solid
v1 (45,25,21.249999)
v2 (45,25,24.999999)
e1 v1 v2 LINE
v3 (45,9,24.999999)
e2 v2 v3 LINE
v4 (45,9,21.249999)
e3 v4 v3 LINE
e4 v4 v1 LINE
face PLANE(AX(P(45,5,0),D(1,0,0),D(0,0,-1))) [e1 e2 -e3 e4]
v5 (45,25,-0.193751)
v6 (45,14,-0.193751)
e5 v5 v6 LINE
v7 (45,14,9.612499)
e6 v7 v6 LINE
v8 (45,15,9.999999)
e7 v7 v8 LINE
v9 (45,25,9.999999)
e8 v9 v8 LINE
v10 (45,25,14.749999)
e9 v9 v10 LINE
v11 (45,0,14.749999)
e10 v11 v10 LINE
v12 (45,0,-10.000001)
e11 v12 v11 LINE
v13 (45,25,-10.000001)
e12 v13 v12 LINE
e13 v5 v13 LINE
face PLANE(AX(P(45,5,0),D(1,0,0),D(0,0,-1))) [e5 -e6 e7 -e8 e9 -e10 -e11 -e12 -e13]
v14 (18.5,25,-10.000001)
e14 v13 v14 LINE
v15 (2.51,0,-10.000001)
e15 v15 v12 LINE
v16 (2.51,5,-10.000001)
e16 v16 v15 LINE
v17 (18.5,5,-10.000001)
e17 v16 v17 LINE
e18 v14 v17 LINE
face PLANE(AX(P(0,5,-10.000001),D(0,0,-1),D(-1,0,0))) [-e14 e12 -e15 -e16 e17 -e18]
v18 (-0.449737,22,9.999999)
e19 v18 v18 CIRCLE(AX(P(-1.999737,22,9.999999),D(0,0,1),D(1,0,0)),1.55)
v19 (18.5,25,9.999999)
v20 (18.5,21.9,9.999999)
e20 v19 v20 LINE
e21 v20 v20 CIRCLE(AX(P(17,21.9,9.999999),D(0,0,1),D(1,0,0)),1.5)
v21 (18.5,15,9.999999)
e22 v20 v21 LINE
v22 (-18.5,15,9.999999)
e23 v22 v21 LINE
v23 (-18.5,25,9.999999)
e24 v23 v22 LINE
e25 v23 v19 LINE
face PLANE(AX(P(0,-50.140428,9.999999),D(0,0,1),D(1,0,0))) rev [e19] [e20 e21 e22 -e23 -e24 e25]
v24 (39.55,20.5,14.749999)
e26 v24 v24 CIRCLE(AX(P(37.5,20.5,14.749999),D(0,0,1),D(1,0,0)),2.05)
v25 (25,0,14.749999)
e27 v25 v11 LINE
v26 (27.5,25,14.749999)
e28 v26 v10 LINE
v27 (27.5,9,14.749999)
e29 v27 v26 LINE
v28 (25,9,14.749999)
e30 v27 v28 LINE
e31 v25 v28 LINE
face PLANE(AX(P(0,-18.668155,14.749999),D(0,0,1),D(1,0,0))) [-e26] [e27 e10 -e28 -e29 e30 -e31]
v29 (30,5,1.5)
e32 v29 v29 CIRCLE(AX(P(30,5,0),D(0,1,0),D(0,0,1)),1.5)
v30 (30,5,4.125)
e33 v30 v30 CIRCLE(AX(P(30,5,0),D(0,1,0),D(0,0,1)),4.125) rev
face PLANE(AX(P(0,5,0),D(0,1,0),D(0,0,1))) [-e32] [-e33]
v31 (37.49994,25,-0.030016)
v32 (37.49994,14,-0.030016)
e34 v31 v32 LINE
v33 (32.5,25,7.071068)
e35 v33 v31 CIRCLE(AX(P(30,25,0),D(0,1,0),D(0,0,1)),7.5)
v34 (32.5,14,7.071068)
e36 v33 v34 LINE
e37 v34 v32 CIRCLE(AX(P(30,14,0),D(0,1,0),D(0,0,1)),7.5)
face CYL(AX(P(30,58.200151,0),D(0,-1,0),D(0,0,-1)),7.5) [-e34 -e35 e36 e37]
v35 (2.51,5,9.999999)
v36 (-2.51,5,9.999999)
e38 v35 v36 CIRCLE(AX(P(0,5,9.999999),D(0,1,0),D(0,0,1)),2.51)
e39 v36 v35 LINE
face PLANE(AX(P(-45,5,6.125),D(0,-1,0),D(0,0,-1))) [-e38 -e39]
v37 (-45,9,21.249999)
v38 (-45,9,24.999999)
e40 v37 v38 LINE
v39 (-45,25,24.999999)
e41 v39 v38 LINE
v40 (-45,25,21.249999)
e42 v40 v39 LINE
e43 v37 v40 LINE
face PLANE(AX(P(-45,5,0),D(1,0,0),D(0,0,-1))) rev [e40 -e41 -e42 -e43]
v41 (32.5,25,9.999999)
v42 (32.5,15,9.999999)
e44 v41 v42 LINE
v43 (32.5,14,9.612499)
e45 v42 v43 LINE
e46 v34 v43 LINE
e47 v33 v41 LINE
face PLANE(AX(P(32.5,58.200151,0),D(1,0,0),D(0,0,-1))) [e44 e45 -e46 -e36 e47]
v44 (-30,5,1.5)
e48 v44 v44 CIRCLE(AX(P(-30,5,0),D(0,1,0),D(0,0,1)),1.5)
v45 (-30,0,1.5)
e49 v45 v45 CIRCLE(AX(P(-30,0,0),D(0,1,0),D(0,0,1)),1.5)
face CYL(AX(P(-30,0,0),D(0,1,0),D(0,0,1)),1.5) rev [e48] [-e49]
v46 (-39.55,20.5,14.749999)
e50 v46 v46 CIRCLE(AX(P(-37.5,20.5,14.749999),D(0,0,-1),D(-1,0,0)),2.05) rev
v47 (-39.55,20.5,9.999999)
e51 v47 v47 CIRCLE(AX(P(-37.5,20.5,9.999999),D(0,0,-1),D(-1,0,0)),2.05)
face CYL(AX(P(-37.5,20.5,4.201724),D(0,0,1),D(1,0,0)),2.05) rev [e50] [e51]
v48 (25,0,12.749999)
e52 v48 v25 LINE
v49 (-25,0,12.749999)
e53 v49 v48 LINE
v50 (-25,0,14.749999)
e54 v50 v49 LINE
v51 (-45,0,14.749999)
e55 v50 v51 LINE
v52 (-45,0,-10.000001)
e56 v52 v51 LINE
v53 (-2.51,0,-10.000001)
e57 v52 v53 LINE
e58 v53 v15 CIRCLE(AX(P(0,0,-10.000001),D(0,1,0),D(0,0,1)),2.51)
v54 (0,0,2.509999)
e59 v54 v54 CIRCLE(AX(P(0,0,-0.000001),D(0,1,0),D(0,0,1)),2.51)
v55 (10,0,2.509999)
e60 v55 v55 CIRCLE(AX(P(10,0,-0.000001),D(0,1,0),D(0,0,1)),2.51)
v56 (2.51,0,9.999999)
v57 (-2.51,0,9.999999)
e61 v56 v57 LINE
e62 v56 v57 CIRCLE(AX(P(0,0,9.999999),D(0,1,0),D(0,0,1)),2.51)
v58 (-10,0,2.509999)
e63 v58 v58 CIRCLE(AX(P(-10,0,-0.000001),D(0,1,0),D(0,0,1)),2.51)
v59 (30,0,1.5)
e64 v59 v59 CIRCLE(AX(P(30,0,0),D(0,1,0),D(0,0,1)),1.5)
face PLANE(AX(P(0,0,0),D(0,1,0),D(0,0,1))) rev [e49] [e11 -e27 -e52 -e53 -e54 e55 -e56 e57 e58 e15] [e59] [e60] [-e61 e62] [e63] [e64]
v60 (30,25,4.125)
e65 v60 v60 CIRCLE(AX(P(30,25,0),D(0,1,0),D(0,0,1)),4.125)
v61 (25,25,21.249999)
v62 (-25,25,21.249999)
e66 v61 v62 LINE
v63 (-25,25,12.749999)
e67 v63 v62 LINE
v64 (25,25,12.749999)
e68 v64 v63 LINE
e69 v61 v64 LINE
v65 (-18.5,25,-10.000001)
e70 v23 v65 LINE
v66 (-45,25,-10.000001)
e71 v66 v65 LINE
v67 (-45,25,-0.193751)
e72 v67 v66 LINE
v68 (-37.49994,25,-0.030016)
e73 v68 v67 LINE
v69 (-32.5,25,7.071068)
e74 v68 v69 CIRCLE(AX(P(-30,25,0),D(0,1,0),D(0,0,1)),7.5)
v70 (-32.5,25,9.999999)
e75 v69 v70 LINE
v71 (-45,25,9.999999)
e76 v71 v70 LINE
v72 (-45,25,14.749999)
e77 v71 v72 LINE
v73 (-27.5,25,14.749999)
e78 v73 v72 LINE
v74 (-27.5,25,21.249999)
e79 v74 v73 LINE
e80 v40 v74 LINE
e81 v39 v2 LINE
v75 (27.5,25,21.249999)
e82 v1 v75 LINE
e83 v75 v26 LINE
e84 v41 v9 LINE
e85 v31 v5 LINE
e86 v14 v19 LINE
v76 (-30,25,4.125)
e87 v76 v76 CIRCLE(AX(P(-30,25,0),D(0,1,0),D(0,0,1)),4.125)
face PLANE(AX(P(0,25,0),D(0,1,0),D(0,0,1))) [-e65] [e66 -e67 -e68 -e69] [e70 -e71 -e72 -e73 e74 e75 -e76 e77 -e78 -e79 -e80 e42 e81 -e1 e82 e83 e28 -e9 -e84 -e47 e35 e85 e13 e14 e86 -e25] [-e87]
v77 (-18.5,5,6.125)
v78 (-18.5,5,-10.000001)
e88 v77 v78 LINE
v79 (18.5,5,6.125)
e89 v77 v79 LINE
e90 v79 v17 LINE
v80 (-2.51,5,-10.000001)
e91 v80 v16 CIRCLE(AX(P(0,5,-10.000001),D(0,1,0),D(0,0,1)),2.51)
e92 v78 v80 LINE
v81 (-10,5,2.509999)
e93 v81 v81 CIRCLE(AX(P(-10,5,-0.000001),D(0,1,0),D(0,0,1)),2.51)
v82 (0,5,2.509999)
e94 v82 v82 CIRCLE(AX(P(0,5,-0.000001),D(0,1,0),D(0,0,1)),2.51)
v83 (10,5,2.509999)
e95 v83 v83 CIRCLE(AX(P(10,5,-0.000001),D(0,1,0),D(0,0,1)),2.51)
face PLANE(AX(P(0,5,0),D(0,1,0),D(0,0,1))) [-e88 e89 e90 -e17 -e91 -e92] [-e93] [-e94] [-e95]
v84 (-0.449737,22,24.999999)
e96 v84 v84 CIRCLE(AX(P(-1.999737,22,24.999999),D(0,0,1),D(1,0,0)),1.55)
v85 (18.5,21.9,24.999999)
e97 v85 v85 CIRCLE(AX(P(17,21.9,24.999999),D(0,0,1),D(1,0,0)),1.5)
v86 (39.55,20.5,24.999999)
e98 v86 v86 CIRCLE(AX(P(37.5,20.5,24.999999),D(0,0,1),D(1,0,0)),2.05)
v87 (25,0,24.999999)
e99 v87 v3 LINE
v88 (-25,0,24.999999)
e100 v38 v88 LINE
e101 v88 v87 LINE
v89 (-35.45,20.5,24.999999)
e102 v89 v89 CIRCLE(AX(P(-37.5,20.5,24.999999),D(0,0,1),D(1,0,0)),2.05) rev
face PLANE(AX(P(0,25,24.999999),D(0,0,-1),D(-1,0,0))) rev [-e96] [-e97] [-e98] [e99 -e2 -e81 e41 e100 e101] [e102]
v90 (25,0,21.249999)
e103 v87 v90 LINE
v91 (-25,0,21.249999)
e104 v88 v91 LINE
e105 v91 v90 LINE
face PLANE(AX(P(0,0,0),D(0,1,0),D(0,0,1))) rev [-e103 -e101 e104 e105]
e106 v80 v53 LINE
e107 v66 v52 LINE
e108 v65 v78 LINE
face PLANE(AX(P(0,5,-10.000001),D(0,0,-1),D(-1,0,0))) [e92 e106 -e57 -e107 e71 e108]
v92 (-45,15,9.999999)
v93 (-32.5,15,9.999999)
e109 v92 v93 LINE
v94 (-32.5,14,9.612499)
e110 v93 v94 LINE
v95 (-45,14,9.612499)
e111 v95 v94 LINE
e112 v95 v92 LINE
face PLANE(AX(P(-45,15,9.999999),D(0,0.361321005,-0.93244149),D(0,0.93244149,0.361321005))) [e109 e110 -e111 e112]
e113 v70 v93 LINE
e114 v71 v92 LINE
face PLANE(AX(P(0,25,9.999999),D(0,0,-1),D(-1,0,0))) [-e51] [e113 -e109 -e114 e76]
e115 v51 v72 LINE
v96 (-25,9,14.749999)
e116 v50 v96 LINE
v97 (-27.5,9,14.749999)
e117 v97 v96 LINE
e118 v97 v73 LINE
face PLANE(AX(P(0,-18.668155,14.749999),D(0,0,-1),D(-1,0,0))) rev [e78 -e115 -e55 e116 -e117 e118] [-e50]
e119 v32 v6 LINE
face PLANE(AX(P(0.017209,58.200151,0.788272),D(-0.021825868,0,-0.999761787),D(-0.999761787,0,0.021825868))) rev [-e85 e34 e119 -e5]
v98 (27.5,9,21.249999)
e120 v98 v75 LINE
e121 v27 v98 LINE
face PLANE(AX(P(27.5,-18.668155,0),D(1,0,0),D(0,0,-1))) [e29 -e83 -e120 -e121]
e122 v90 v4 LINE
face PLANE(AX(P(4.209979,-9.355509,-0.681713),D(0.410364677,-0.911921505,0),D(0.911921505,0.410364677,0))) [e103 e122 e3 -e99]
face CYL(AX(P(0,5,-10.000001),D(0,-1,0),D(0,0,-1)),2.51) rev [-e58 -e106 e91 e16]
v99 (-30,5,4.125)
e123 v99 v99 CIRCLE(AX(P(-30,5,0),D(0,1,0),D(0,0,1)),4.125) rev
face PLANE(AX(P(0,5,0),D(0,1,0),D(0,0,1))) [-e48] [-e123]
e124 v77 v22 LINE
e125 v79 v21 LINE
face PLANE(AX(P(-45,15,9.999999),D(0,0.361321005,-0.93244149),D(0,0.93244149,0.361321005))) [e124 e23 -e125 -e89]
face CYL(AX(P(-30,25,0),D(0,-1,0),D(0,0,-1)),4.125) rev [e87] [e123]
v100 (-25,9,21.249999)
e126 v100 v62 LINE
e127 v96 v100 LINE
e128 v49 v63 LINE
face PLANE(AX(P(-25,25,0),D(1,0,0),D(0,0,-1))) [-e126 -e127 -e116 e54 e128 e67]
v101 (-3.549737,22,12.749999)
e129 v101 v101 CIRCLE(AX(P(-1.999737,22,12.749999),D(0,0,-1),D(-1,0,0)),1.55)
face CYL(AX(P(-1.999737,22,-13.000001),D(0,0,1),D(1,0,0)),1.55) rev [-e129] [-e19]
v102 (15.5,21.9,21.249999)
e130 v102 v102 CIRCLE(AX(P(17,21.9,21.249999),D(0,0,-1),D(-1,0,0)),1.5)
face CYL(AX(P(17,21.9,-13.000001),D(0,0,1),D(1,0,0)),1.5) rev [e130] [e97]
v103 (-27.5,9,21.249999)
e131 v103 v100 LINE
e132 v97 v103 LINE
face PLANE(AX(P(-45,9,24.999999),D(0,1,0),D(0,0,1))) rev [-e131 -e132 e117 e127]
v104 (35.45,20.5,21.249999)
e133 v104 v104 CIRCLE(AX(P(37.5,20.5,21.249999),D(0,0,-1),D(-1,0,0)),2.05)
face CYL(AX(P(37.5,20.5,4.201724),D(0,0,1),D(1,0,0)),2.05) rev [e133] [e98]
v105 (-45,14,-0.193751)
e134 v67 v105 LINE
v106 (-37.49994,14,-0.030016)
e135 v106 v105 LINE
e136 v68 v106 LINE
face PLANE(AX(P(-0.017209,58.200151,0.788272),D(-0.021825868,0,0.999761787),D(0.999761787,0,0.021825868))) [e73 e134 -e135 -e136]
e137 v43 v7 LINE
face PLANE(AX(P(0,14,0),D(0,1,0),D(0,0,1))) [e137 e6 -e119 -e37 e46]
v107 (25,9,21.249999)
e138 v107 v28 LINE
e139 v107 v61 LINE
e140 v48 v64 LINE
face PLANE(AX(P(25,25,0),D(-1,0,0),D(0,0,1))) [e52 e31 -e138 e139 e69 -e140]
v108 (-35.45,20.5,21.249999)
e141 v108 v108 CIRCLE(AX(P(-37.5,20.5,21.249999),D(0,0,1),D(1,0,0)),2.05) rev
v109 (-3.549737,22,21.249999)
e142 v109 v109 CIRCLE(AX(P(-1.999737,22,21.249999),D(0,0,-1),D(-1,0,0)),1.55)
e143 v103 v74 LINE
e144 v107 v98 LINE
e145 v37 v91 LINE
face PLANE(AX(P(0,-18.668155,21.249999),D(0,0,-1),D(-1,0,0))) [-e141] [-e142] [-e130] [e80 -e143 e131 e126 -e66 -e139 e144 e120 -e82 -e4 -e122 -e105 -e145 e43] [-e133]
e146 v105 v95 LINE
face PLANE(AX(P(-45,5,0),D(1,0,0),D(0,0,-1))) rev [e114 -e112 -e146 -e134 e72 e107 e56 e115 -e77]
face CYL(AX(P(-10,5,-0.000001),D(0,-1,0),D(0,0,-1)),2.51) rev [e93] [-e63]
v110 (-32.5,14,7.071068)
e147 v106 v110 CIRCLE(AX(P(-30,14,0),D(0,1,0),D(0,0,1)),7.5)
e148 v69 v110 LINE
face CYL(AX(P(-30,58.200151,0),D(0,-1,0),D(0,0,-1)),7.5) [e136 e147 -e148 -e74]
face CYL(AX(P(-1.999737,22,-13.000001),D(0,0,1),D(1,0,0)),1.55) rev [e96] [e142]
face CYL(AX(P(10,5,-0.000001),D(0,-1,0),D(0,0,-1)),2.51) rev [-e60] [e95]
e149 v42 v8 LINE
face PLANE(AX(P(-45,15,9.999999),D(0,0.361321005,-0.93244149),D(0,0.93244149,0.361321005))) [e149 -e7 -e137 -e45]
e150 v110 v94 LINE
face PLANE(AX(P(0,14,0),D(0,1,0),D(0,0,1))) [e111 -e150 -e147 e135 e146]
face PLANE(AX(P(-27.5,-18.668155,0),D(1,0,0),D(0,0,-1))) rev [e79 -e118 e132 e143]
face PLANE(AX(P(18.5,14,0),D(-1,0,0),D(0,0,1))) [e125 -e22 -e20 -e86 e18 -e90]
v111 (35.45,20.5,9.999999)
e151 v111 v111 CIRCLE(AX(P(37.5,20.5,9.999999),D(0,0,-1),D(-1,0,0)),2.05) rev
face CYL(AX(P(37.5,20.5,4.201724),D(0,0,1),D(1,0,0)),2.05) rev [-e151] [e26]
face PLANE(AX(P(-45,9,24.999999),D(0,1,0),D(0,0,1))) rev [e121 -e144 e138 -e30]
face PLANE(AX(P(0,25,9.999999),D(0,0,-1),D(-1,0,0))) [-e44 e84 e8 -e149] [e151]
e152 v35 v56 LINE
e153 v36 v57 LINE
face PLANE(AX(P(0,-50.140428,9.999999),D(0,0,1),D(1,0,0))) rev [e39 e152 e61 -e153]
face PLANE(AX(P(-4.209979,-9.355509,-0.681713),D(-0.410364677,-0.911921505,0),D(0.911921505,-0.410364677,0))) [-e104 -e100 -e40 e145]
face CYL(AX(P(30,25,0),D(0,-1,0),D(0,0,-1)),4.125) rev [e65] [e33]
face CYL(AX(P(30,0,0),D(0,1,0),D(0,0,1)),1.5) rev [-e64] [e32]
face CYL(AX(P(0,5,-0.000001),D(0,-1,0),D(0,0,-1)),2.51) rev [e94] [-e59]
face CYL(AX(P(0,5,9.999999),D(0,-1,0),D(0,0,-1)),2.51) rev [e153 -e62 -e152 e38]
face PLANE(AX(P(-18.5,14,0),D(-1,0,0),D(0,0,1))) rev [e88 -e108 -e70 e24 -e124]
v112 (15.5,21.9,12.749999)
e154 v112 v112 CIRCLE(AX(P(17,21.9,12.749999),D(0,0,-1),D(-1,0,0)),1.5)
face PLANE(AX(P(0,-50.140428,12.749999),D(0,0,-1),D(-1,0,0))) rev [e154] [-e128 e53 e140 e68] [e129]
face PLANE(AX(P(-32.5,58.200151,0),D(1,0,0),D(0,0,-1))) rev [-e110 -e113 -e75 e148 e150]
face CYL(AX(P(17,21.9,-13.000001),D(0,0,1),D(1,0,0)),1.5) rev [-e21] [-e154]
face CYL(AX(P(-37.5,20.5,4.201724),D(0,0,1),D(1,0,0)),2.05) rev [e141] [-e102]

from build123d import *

# Parameters (mm, degrees)
SKETCH1_R               = 2.51
BOSS_EXTRUDE1_DEPTH     = 5
SKETCH2_R               = 6.125
SKETCH2_R_2             = 4.125
BOSS_EXTRUDE2_DEPTH     = 20
SKETCH1_3_W             = 20
SKETCH1_3_H             = 15
BOSS_EXTRUDE3_DEPTH     = 25
SKETCH3_W               = 17.5
SKETCH3_H               = 6.5
CUT_EXTRUDE2_DEPTH      = 21.5
CUT_EXTRUDE3_REACH      = 64.249
SKETCH4_R               = 2.05
SKETCH5_W               = 13.25
SKETCH5_H               = 9
CUT_EXTRUDE4_DEPTH      = 97.695397829
BOSS_EXTRUDE4_DEPTH     = 90
SKETCH9_R               = 1.5
CUT_EXTRUDE6_DEPTH      = 56.226804735
BOSS_EXTRUDE9_OUTLINE_W = 26.5
BOSS_EXTRUDE9_OUTLINE_H = 20
BOSS_EXTRUDE9_OUTLINE_R = 6.125
BOSS_EXTRUDE9_DEPTH     = 9
SKETCH12_R              = 7.5
SKETCH12_R_2            = 6.125
SKETCH12_W              = 5
SKETCH12_H              = 0.387499923
BOSS_EXTRUDE10_DEPTH    = 11
BOSS_EXTRUDE11_START    = -25
SKETCH13_W              = 50
SKETCH13_H              = 3.75
BOSS_EXTRUDE11_DEPTH    = 25
BOSS_EXTRUDE12_DEPTH    = 9
BOSS_EXTRUDE13_DEPTH    = 3.75
SKETCH16_R              = 1.55
SKETCH16_R_2            = 1.5
CUT_EXTRUDE7_DEPTH      = 38


# Read off the part's stored shape, not the designer's step: Boss-Extrude9
with BuildPart() as part:
    # Sketch1 → Boss-Extrude1 (new body)
    with BuildSketch(Plane(origin=(0, 0, 0), x_dir=(1, 0, 0), z_dir=(0, 1, 0))):
        with BuildLine():
            ThreePointArc((-2.51, -9.999999226), (0, -7.489999226), (2.51, -9.999999226))
            Line((2.51, -9.999999226), (45, -9.999999226))
            Line((45, -9.999999226), (45, 10.000000774))
            Line((45, 10.000000774), (2.51, 10.000000774))
            ThreePointArc((2.51, 10.000000774), (0, 7.490000774), (-2.51, 10.000000774))
            Line((-2.51, 10.000000774), (-45, 10.000000774))
            Line((-45, 10.000000774), (-45, -9.999999226))
            Line((-45, -9.999999226), (-2.51, -9.999999226))
        make_face()
        with BuildLine():
            ThreePointArc((-7.500032569, 0.22419454), (-10, -2.509999226), (-12.499967431, 0.22419454))
            ThreePointArc((-12.499967431, 0.22419454), (-10, 2.510000774), (-7.500032569, 0.22419454))
        make_face(mode=Mode.SUBTRACT)
        with BuildLine():
            ThreePointArc((2.499967431, 0.22419454), (0, -2.509999226), (-2.499967431, 0.22419454))
            ThreePointArc((-2.499967431, 0.22419454), (0, 2.510000774), (2.499967431, 0.22419454))
        make_face(mode=Mode.SUBTRACT)
        with Locations(Location((10, 7.74e-07, 0), (0, 0, 270))):
            Circle(SKETCH1_R, mode=Mode.SUBTRACT)
    extrude(amount=BOSS_EXTRUDE1_DEPTH)

    # Sketch2 → Boss-Extrude2 (add)
    # profile 1 of 2: a face of its own
    with BuildSketch(Plane(origin=(0, 5, 0), x_dir=(1, 0, 0), z_dir=(0, 1, 0))):
        with Locations(Location((-30, 0, 0), (0, 0, 270))):
            Circle(SKETCH2_R)
        with Locations(Location((-30, 0, 0), (0, 0, 270))):
            Circle(SKETCH2_R_2, mode=Mode.SUBTRACT)
    # profile 2 of 2: a face of its own
    with BuildSketch(Plane(origin=(0, 5, 0), x_dir=(1, 0, 0), z_dir=(0, 1, 0))):
        with Locations(Location((30, 0, 0), (0, 0, 270))):
            Circle(SKETCH2_R)
        with Locations(Location((30, 0, 0), (0, 0, 270))):
            Circle(SKETCH2_R_2, mode=Mode.SUBTRACT)
    extrude(amount=BOSS_EXTRUDE2_DEPTH)

    # Sketch1<3> → Boss-Extrude3 (add)
    with BuildSketch(Plane(origin=(0, 0, 0), x_dir=(1, 0, 0), z_dir=(0, 1, 0))):
        with Locations((35, -17.499999226)):
            Rectangle(SKETCH1_3_W, SKETCH1_3_H)
        with Locations((-35, -17.499999226)):
            Rectangle(SKETCH1_3_W, SKETCH1_3_H)
    extrude(amount=BOSS_EXTRUDE3_DEPTH)

    # Sketch3 → Cut-Extrude2 (cut)
    with BuildSketch(Plane(origin=(0, 25, 0), x_dir=(1, 0, 0), z_dir=(0, 1, 0))):
        with Locations((36.25, -17.999999226)):
            Rectangle(SKETCH3_W, SKETCH3_H)
        with Locations((-36.25, -17.999999226)):
            Rectangle(SKETCH3_W, SKETCH3_H)
    extrude(amount=-CUT_EXTRUDE2_DEPTH, mode=Mode.SUBTRACT)

    # Cut-Extrude3: up to this face of the body (flat: up to its plane)
    cut_extrude3_end = Plane(part.part.faces().sort_by_distance((35, 15, 9.999999226))[0])
    # Sketch4 → Cut-Extrude3 (cut, up to the picked face)
    with BuildSketch(Plane.XY.offset(24.999999226), mode=Mode.PRIVATE) as cut_extrude3_sk1:
        with Locations((37.5, 20.5)):
            Circle(SKETCH4_R)
    cut_extrude3_tool1 = split(extrude(cut_extrude3_sk1.sketch, amount=-CUT_EXTRUDE3_REACH, mode=Mode.PRIVATE), bisect_by=cut_extrude3_end, keep=Keep.BOTH, mode=Mode.PRIVATE)
    # Sketch4 → Cut-Extrude3 (cut, up to the picked face)
    with BuildSketch(Plane.XY.offset(24.999999226), mode=Mode.PRIVATE) as cut_extrude3_sk2:
        with Locations((-37.5, 20.5)):
            Circle(SKETCH4_R)
    cut_extrude3_tool2 = split(extrude(cut_extrude3_sk2.sketch, amount=-CUT_EXTRUDE3_REACH, mode=Mode.PRIVATE), bisect_by=cut_extrude3_end, keep=Keep.BOTH, mode=Mode.PRIVATE)
    add(cut_extrude3_tool1.solids().sort_by(Axis((37.5, 20.5, 24.999999), (0, 0, -1)))[0], mode=Mode.SUBTRACT)
    add(cut_extrude3_tool2.solids().sort_by(Axis((-37.5, 20.5, 24.999999), (0, 0, -1)))[0], mode=Mode.SUBTRACT)

    # Sketch5 → Cut-Extrude4 (cut, through all)
    with BuildSketch(Plane(origin=(45, 0, 0), x_dir=(0, 0, -1), z_dir=(1, 0, 0))):
        with Locations((-18.374999226, 4.5)):
            Rectangle(SKETCH5_W, SKETCH5_H)
    extrude(amount=-CUT_EXTRUDE4_DEPTH, mode=Mode.SUBTRACT)

    # Sketch6 → Boss-Extrude4 (add, through all)
    with BuildSketch(Plane(origin=(45, 0, 0), x_dir=(0, 0, -1), z_dir=(1, 0, 0))):
        Polygon((-9.999999226, 15), (-6.125, 5), (-9.999999226, 5), align=None)
    extrude(amount=-BOSS_EXTRUDE4_DEPTH)

    # Sketch9 → Cut-Extrude6 (cut, through all)
    with BuildSketch(Plane(origin=(0, 5, 0), x_dir=(1, 0, 0), z_dir=(0, 1, 0))):
        with Locations(Location((30, 0, 0), (0, 0, 270))):
            Circle(SKETCH9_R)
        with Locations(Location((-30, 0, 0), (0, 0, 270))):
            Circle(SKETCH9_R)
    extrude(amount=-CUT_EXTRUDE6_DEPTH, mode=Mode.SUBTRACT)

    # Boss-Extrude9 outline → Boss-Extrude9 (add)
    # profile 1 of 2: a face of its own
    with BuildSketch(Plane(origin=(0, 5, 0), x_dir=(1, 0, 0), z_dir=(0, 1, 0))):
        with Locations((-31.75, 7.74e-07)):
            Rectangle(BOSS_EXTRUDE9_OUTLINE_W, BOSS_EXTRUDE9_OUTLINE_H)
        with Locations((-30, 0)):
            Circle(BOSS_EXTRUDE9_OUTLINE_R, mode=Mode.SUBTRACT)
    # profile 2 of 2: a face of its own
    with BuildSketch(Plane(origin=(0, 5, 0), x_dir=(1, 0, 0), z_dir=(0, 1, 0))):
        with Locations((31.75, 7.74e-07)):
            Rectangle(BOSS_EXTRUDE9_OUTLINE_W, BOSS_EXTRUDE9_OUTLINE_H)
        with Locations((30, 0)):
            Circle(BOSS_EXTRUDE9_OUTLINE_R, mode=Mode.SUBTRACT)
    extrude(amount=BOSS_EXTRUDE9_DEPTH)

    # Sketch12 → Boss-Extrude10 (add)
    # profile 1 of 8: a face of its own
    with BuildSketch(Plane(origin=(0, 14, 0), x_dir=(1, 0, 0), z_dir=(0, 1, 0))):
        with BuildLine():
            Line((32.5, -9.612499303), (32.5, -7.071067812))
            ThreePointArc((32.5, -7.071067812), (30, -7.5), (27.5, -7.071067812))
            Line((27.5, -7.071067812), (27.5, -9.612499303))
            Line((27.5, -9.612499303), (32.5, -9.612499303))
        make_face()
    # profile 2 of 8: a face of its own
    with BuildSketch(Plane(origin=(0, 14, 0), x_dir=(1, 0, 0), z_dir=(0, 1, 0))):
        with Locations((30, 0)):
            Circle(SKETCH12_R)
        with Locations((30, 0)):
            Circle(SKETCH12_R_2, mode=Mode.SUBTRACT)
    # profile 3 of 8: a face of its own
    with BuildSketch(Plane(origin=(0, 14, 0), x_dir=(1, 0, 0), z_dir=(0, 1, 0))):
        with BuildLine():
            Line((-32.5, -7.071067812), (-32.5, -9.999999226))
            Line((-32.5, -9.999999226), (-27.5, -9.999999226))
            Line((-27.5, -9.999999226), (-27.5, -7.071067812))
            ThreePointArc((-27.5, -7.071067812), (-30, -7.5), (-32.5, -7.071067812))
        make_face()
    # profile 4 of 8: a face of its own
    with BuildSketch(Plane(origin=(0, 14, 0), x_dir=(1, 0, 0), z_dir=(0, 1, 0))):
        with Locations((-30, 0)):
            Circle(SKETCH12_R)
        with Locations((-30, 0)):
            Circle(SKETCH12_R_2, mode=Mode.SUBTRACT)
    # profile 5 of 8: a face of its own
    with BuildSketch(Plane(origin=(0, 14, 0), x_dir=(1, 0, 0), z_dir=(0, 1, 0))):
        with Locations((30, -9.806249264)):
            Rectangle(SKETCH12_W, SKETCH12_H)
    # profile 6 of 8: a face of its own
    with BuildSketch(Plane(origin=(0, 14, 0), x_dir=(1, 0, 0), z_dir=(0, 1, 0))):
        with BuildLine():
            Line((27.5, -9.612499303), (27.5, -7.071067812))
            ThreePointArc((27.5, -7.071067812), (25.657627479, 6.115047088), (37.499939934, 0.030016408))
            Line((37.499939934, 0.030016408), (45, 0.193750736))
            Line((45, 0.193750736), (45, 10.000000774))
            Line((45, 10.000000774), (18.5, 10.000000774))
            Line((18.5, 10.000000774), (18.5, -9.612499303))
            Line((18.5, -9.612499303), (27.5, -9.612499303))
        make_face()
    # profile 7 of 8: a face of its own
    with BuildSketch(Plane(origin=(0, 14, 0), x_dir=(1, 0, 0), z_dir=(0, 1, 0))):
        with BuildLine():
            Line((-27.5, -7.071067812), (-27.5, -9.999999226))
            Line((-27.5, -9.999999226), (-25, -9.999999226))
            Line((-25, -9.999999226), (-18.5, -9.999999226))
            Line((-18.5, -9.999999226), (-18.5, -9.612499303))
            Line((-18.5, -9.612499303), (-18.5, 10.000000774))
            Line((-18.5, 10.000000774), (-45, 10.000000774))
            Line((-45, 10.000000774), (-45, 0.193750736))
            Line((-45, 0.193750736), (-37.499939934, 0.030016408))
            ThreePointArc((-37.499939934, 0.030016408), (-29.984991766, 7.499984984), (-22.5, 0))
            ThreePointArc((-22.5, 0), (-23.876275643, -4.330127019), (-27.5, -7.071067812))
        make_face()
    # profile 8 of 8: a face of its own
    with BuildSketch(Plane(origin=(0, 14, 0), x_dir=(1, 0, 0), z_dir=(0, 1, 0))):
        Polygon((27.5, -9.999999226), (27.5, -9.612499303), (18.5, -9.612499303), (18.5, -9.999999226), (25, -9.999999226), align=None)
    extrude(amount=BOSS_EXTRUDE10_DEPTH)

    # Sketch13 → Boss-Extrude11 (add)
    with BuildSketch(Plane(origin=(0, 25, 0), x_dir=(1, 0, 0), z_dir=(0, 1, 0)).offset(BOSS_EXTRUDE11_START)):
        with Locations((0, -23.124999226)):
            Rectangle(SKETCH13_W, SKETCH13_H)
        Polygon((25, -12.749999226), (25, -9.999999226), (18.5, -9.999999226), (-25, -9.999999226), (-25, -12.749999226), align=None)
    extrude(amount=BOSS_EXTRUDE11_DEPTH)

    # Sketch14 → Boss-Extrude12 (add)
    with BuildSketch(Plane.XZ.offset(-9)):
        Polygon((-25, 14.749999226), (-27.5, 14.749999226), (-45, 14.749999226), (-45, 11.749999226), (-25, 11.749999226), (-25, 12.749999226), align=None)
        Polygon((45, 14.749999226), (27.5, 14.749999226), (25, 14.749999226), (25, 12.749999226), (25, 11.749999226), (45, 11.749999226), align=None)
    extrude(amount=BOSS_EXTRUDE12_DEPTH)

    # Sketch15 → Boss-Extrude13 (add)
    with BuildSketch(Plane.XY.offset(24.999999226)):
        Polygon((-45, 9), (-25, 0), (-25, 9), align=None)
        Polygon((25, 0), (45, 9), (25, 9), align=None)
    extrude(amount=-BOSS_EXTRUDE13_DEPTH)

    # Sketch16 → Cut-Extrude7 (cut)
    with BuildSketch(Plane.XY.offset(24.999999226)):
        with Locations((-1.99973684, 22)):
            Circle(SKETCH16_R)
        with Locations((17, 21.9)):
            Circle(SKETCH16_R_2)
    extrude(amount=-CUT_EXTRUDE7_DEPTH, mode=Mode.SUBTRACT)


solid = part.part
